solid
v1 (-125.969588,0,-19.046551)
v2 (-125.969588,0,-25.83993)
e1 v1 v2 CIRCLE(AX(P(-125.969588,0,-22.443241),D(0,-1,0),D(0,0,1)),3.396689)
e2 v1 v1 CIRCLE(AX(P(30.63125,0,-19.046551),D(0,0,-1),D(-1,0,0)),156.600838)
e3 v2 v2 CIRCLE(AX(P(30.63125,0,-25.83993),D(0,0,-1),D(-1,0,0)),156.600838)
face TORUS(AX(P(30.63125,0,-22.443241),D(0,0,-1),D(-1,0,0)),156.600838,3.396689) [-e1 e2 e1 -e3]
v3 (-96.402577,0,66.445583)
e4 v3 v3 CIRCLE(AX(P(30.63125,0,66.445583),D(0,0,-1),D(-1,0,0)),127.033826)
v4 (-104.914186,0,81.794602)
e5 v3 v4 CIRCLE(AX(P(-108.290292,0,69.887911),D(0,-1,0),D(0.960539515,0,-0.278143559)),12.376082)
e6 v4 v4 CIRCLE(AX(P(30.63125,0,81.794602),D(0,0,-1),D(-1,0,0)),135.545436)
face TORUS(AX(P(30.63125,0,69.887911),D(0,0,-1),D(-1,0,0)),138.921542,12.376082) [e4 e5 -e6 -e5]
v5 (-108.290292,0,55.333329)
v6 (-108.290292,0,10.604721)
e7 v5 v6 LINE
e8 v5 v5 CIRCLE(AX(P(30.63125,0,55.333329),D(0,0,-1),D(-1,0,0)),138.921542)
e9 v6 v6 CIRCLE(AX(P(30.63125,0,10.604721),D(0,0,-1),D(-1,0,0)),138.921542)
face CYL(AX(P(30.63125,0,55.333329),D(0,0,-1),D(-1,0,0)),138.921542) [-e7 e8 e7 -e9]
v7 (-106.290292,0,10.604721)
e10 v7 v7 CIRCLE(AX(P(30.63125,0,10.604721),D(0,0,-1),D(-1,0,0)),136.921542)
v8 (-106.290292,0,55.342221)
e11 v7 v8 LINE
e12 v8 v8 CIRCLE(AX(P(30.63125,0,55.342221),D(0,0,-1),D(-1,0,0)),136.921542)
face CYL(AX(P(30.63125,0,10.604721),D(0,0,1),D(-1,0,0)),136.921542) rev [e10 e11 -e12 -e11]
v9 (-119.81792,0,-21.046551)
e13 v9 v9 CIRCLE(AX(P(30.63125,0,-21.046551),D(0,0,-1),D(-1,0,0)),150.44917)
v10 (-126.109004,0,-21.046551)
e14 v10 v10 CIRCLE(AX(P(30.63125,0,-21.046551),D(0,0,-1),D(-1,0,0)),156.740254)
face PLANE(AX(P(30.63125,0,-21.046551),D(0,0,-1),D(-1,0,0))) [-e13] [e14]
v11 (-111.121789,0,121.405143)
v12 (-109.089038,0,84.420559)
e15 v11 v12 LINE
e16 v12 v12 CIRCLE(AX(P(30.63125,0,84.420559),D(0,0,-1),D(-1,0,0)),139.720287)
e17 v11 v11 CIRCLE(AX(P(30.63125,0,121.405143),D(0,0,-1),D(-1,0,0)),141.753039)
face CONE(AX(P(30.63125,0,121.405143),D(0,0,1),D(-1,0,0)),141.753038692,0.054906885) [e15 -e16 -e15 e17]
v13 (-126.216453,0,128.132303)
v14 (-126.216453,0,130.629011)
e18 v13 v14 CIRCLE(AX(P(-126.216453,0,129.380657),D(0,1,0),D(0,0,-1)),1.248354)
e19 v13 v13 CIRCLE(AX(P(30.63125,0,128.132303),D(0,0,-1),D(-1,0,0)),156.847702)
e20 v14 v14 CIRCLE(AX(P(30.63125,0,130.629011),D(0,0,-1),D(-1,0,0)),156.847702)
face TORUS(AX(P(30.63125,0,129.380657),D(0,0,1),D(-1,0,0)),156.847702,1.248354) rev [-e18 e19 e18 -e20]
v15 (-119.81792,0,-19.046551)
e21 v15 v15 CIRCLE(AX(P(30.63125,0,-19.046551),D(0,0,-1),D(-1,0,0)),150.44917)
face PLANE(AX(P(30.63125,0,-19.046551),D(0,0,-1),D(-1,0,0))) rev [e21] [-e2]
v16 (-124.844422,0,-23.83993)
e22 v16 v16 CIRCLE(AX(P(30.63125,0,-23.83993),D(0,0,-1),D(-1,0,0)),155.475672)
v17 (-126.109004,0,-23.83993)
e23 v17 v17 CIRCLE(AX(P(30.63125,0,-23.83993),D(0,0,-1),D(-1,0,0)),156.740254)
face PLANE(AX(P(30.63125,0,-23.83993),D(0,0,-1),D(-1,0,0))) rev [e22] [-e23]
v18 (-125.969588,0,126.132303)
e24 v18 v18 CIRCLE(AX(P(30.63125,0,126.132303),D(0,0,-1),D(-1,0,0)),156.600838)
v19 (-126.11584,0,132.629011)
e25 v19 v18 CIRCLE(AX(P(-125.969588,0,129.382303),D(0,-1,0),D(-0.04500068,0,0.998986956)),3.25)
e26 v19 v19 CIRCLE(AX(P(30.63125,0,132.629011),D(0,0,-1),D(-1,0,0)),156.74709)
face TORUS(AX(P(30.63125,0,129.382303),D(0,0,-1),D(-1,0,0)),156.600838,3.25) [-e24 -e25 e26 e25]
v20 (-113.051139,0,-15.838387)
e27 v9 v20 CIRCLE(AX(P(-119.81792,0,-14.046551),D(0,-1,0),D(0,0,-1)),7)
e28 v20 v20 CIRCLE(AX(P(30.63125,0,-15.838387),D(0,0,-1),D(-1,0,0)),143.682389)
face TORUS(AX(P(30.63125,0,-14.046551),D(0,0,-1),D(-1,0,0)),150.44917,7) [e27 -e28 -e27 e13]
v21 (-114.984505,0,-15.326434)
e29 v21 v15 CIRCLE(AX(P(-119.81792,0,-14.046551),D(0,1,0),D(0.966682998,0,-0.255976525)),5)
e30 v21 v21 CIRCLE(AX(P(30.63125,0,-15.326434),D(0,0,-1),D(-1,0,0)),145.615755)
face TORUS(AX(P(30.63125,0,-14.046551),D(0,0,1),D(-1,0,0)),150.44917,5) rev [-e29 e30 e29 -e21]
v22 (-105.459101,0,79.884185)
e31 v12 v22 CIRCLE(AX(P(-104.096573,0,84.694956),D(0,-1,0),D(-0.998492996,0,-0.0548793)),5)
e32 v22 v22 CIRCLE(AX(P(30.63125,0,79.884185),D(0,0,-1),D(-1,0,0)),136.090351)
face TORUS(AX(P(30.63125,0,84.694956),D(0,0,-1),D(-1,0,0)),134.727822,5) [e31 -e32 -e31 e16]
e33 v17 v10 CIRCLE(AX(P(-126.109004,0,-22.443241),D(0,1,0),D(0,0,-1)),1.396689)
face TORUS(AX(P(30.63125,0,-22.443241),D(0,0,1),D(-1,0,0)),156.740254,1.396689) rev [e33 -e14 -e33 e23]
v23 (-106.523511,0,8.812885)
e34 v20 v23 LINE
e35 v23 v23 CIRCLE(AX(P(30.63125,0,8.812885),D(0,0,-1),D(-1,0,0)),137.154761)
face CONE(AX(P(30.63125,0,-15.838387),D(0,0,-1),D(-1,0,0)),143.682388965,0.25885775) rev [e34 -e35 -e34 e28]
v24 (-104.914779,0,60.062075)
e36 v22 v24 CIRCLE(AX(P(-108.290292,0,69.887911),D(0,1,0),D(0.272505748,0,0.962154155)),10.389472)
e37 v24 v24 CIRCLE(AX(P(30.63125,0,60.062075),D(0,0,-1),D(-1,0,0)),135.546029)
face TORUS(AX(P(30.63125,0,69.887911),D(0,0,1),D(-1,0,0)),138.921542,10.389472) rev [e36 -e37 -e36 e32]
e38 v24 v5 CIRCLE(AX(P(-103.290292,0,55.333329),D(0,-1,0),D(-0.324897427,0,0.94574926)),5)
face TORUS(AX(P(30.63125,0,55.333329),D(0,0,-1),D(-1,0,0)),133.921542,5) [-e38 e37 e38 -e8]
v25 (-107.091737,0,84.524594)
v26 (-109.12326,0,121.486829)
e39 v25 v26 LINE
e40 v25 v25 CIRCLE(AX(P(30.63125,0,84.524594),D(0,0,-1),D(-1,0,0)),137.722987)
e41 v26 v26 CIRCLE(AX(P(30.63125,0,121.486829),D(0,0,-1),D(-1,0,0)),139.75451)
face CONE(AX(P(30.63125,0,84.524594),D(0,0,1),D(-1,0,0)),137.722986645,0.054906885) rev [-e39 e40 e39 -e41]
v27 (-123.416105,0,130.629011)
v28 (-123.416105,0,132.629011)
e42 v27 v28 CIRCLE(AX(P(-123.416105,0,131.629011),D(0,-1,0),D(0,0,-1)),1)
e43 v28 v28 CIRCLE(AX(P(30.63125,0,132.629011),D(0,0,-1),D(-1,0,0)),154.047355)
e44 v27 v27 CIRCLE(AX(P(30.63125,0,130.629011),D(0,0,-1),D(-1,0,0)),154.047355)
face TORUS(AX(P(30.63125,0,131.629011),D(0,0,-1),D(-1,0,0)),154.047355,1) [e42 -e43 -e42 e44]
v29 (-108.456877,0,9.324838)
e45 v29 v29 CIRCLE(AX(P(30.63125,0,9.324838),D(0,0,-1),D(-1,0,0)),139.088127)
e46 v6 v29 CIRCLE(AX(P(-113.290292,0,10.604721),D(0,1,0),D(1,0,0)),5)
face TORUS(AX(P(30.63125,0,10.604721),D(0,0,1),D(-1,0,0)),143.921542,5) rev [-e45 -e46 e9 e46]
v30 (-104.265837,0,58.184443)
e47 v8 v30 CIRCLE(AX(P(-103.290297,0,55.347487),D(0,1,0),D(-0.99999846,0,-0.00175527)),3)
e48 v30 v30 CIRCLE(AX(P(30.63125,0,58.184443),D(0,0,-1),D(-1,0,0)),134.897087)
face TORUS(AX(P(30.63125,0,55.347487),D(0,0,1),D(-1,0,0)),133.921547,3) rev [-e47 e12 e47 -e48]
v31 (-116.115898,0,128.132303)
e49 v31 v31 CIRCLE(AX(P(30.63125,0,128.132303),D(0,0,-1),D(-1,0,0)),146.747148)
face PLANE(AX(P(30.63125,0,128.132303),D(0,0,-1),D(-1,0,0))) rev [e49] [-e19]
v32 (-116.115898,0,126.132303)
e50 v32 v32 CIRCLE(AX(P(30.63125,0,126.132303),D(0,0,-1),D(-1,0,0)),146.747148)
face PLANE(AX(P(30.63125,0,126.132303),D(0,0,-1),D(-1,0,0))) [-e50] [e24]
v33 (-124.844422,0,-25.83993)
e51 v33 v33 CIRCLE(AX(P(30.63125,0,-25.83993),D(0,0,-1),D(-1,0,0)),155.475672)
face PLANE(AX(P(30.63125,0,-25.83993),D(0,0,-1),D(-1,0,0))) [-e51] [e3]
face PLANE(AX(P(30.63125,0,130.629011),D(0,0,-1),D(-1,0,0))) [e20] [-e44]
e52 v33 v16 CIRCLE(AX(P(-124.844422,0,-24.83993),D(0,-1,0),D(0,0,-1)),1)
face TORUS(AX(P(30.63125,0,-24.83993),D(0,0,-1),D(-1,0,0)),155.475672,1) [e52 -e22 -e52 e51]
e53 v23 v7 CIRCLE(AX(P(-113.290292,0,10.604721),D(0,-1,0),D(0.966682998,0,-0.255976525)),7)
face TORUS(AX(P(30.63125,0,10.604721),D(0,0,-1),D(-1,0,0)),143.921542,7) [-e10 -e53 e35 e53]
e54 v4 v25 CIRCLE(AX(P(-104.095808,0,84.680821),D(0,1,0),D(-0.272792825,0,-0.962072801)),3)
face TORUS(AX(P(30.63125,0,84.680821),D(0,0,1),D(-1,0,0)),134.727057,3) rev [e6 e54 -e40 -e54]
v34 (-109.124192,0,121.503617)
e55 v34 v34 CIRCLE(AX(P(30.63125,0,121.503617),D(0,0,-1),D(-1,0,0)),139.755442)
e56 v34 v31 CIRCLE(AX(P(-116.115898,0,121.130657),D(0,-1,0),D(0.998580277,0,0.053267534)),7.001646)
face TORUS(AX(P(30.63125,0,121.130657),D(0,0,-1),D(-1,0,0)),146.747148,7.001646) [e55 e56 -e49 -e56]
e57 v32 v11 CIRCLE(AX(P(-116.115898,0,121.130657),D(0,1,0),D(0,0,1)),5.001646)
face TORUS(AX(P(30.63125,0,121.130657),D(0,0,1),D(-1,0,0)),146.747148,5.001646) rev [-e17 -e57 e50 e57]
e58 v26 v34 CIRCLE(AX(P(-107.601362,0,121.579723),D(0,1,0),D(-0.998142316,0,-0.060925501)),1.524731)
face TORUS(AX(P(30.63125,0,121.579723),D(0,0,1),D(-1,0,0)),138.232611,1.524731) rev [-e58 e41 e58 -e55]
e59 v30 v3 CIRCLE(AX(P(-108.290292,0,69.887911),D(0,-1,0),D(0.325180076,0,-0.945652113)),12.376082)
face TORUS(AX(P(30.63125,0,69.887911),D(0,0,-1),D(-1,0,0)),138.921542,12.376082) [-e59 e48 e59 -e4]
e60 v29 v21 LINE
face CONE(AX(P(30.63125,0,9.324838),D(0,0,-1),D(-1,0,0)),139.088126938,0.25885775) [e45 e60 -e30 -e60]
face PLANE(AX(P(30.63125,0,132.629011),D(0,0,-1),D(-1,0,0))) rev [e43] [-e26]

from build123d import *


# Not quite as in the source:
# - ends of sketch curves that miss each other by under 0.0002 mm in the source are joined


with BuildPart() as f1:
    # F0 (on Front) → F1 (revolve)
    with BuildSketch(Plane.XZ):
        with BuildLine():
            Line((-119.8179203278, -19.0465514287), (-125.9695880596, -19.0465514287))
            ThreePointArc((-125.9695880596, -19.0465514287), (-129.3662774079, -22.443240777), (-125.9695880596, -25.8399301254))
            Line((-125.9695880596, -25.8399301254), (-124.844422109, -25.8399301254))
            ThreePointArc((-124.844422109, -25.8399301254), (-123.844422109, -24.8399301254), (-124.844422109, -23.8399301254))
            Line((-124.844422109, -23.8399301254), (-126.1090040207, -23.8399301254))
            ThreePointArc((-126.1090040207, -23.8399301254), (-127.505693369, -22.443240777), (-126.1090040207, -21.0465514287))
            Line((-126.1090040207, -21.0465514287), (-119.8179203278, -21.0465514287))
            ThreePointArc((-119.8179203278, -21.0465514287), (-115.5484267824, -19.5937511607), (-113.051139342, -15.8383871048))
            Line((-113.051139342, -15.8383871048), (-106.5235113191, 8.8128852061))
            ThreePointArc((-106.5235113191, 8.8128852061), (-106.3488419197, 9.7012461733), (-106.2902923049, 10.6047208822))
            Line((-106.2902923049, 10.6047208822), (-106.2902923049, 55.3422208118))
            ThreePointArc((-106.2902923049, 55.3422208118), (-105.7338143755, 57.0879527893), (-104.265837153, 58.1844429614))
            ThreePointArc((-104.265837153, 58.1844429614), (-99.325868004, 61.3552385973), (-96.4025768764, 66.445583295))
            ThreePointArc((-96.4025768764, 66.445583295), (-97.4669768084, 75.8898468365), (-104.9141860429, 81.7946021806))
            ThreePointArc((-104.9141860429, 81.7946021806), (-106.4411114383, 82.8101122267), (-107.0917370222, 84.5245941211))
            Line((-107.0917370222, 84.5245941211), (-109.1232600955, 121.4868285056))
            ThreePointArc((-109.1232600955, 121.4868285056), (-109.1237491724, 121.4952214879), (-109.1241919641, 121.5036170425))
            ThreePointArc((-109.1241919641, 121.5036170425), (-111.2986521131, 126.2117189643), (-116.1158979645, 128.1323030038))
            Line((-116.1158979645, 128.1323030038), (-126.2164527022, 128.1323030038))
            ThreePointArc((-126.2164527022, 128.1323030038), (-127.4648065061, 129.3806568078), (-126.2164527022, 130.6290106117))
            Line((-126.2164527022, 130.6290106117), (-123.416104953, 130.6290106117))
            ThreePointArc((-123.416104953, 130.6290106117), (-122.416104953, 131.6290106117), (-123.416104953, 132.6290106117))
            Line((-123.416104953, 132.6290106117), (-126.1158402698, 132.6290106117))
            ThreePointArc((-126.1158402698, 132.6290106117), (-129.2187648573, 129.3091583717), (-125.9695880596, 126.1323030038))
            Line((-125.9695880596, 126.1323030038), (-116.1158979645, 126.1323030038))
            ThreePointArc((-116.1158979645, 126.1323030038), (-112.6776149261, 124.7631043258), (-111.1217890692, 121.4051434602))
            Line((-111.1217890692, 121.4051434602), (-109.0890375897, 84.4205590276))
            ThreePointArc((-109.0890375897, 84.4205590276), (-108.0005653329, 81.5710411847), (-105.4591013497, 79.8841847552))
            ThreePointArc((-105.4591013497, 79.8841847552), (-97.9047348476, 70.1731016366), (-104.9147794404, 60.0620748147))
            ThreePointArc((-104.9147794404, 60.0620748147), (-107.3598399258, 58.2382867202), (-108.2902923049, 55.3333285171))
            Line((-108.2902923049, 55.3333285171), (-108.2902923049, 10.6047208822))
            ThreePointArc((-108.2902923049, 10.6047208822), (-108.3321134583, 9.9593818044), (-108.456877315, 9.3248382564))
            Line((-108.456877315, 9.3248382564), (-114.9845053379, -15.3264340545))
            ThreePointArc((-114.9845053379, -15.3264340545), (-116.7682820811, -18.0088369515), (-119.8179203278, -19.0465514287))
        make_face()
    revolve(axis=Axis((30.6312496229, 0, 51.8589288074), (0, 0, -1)))


solid = f1.part
